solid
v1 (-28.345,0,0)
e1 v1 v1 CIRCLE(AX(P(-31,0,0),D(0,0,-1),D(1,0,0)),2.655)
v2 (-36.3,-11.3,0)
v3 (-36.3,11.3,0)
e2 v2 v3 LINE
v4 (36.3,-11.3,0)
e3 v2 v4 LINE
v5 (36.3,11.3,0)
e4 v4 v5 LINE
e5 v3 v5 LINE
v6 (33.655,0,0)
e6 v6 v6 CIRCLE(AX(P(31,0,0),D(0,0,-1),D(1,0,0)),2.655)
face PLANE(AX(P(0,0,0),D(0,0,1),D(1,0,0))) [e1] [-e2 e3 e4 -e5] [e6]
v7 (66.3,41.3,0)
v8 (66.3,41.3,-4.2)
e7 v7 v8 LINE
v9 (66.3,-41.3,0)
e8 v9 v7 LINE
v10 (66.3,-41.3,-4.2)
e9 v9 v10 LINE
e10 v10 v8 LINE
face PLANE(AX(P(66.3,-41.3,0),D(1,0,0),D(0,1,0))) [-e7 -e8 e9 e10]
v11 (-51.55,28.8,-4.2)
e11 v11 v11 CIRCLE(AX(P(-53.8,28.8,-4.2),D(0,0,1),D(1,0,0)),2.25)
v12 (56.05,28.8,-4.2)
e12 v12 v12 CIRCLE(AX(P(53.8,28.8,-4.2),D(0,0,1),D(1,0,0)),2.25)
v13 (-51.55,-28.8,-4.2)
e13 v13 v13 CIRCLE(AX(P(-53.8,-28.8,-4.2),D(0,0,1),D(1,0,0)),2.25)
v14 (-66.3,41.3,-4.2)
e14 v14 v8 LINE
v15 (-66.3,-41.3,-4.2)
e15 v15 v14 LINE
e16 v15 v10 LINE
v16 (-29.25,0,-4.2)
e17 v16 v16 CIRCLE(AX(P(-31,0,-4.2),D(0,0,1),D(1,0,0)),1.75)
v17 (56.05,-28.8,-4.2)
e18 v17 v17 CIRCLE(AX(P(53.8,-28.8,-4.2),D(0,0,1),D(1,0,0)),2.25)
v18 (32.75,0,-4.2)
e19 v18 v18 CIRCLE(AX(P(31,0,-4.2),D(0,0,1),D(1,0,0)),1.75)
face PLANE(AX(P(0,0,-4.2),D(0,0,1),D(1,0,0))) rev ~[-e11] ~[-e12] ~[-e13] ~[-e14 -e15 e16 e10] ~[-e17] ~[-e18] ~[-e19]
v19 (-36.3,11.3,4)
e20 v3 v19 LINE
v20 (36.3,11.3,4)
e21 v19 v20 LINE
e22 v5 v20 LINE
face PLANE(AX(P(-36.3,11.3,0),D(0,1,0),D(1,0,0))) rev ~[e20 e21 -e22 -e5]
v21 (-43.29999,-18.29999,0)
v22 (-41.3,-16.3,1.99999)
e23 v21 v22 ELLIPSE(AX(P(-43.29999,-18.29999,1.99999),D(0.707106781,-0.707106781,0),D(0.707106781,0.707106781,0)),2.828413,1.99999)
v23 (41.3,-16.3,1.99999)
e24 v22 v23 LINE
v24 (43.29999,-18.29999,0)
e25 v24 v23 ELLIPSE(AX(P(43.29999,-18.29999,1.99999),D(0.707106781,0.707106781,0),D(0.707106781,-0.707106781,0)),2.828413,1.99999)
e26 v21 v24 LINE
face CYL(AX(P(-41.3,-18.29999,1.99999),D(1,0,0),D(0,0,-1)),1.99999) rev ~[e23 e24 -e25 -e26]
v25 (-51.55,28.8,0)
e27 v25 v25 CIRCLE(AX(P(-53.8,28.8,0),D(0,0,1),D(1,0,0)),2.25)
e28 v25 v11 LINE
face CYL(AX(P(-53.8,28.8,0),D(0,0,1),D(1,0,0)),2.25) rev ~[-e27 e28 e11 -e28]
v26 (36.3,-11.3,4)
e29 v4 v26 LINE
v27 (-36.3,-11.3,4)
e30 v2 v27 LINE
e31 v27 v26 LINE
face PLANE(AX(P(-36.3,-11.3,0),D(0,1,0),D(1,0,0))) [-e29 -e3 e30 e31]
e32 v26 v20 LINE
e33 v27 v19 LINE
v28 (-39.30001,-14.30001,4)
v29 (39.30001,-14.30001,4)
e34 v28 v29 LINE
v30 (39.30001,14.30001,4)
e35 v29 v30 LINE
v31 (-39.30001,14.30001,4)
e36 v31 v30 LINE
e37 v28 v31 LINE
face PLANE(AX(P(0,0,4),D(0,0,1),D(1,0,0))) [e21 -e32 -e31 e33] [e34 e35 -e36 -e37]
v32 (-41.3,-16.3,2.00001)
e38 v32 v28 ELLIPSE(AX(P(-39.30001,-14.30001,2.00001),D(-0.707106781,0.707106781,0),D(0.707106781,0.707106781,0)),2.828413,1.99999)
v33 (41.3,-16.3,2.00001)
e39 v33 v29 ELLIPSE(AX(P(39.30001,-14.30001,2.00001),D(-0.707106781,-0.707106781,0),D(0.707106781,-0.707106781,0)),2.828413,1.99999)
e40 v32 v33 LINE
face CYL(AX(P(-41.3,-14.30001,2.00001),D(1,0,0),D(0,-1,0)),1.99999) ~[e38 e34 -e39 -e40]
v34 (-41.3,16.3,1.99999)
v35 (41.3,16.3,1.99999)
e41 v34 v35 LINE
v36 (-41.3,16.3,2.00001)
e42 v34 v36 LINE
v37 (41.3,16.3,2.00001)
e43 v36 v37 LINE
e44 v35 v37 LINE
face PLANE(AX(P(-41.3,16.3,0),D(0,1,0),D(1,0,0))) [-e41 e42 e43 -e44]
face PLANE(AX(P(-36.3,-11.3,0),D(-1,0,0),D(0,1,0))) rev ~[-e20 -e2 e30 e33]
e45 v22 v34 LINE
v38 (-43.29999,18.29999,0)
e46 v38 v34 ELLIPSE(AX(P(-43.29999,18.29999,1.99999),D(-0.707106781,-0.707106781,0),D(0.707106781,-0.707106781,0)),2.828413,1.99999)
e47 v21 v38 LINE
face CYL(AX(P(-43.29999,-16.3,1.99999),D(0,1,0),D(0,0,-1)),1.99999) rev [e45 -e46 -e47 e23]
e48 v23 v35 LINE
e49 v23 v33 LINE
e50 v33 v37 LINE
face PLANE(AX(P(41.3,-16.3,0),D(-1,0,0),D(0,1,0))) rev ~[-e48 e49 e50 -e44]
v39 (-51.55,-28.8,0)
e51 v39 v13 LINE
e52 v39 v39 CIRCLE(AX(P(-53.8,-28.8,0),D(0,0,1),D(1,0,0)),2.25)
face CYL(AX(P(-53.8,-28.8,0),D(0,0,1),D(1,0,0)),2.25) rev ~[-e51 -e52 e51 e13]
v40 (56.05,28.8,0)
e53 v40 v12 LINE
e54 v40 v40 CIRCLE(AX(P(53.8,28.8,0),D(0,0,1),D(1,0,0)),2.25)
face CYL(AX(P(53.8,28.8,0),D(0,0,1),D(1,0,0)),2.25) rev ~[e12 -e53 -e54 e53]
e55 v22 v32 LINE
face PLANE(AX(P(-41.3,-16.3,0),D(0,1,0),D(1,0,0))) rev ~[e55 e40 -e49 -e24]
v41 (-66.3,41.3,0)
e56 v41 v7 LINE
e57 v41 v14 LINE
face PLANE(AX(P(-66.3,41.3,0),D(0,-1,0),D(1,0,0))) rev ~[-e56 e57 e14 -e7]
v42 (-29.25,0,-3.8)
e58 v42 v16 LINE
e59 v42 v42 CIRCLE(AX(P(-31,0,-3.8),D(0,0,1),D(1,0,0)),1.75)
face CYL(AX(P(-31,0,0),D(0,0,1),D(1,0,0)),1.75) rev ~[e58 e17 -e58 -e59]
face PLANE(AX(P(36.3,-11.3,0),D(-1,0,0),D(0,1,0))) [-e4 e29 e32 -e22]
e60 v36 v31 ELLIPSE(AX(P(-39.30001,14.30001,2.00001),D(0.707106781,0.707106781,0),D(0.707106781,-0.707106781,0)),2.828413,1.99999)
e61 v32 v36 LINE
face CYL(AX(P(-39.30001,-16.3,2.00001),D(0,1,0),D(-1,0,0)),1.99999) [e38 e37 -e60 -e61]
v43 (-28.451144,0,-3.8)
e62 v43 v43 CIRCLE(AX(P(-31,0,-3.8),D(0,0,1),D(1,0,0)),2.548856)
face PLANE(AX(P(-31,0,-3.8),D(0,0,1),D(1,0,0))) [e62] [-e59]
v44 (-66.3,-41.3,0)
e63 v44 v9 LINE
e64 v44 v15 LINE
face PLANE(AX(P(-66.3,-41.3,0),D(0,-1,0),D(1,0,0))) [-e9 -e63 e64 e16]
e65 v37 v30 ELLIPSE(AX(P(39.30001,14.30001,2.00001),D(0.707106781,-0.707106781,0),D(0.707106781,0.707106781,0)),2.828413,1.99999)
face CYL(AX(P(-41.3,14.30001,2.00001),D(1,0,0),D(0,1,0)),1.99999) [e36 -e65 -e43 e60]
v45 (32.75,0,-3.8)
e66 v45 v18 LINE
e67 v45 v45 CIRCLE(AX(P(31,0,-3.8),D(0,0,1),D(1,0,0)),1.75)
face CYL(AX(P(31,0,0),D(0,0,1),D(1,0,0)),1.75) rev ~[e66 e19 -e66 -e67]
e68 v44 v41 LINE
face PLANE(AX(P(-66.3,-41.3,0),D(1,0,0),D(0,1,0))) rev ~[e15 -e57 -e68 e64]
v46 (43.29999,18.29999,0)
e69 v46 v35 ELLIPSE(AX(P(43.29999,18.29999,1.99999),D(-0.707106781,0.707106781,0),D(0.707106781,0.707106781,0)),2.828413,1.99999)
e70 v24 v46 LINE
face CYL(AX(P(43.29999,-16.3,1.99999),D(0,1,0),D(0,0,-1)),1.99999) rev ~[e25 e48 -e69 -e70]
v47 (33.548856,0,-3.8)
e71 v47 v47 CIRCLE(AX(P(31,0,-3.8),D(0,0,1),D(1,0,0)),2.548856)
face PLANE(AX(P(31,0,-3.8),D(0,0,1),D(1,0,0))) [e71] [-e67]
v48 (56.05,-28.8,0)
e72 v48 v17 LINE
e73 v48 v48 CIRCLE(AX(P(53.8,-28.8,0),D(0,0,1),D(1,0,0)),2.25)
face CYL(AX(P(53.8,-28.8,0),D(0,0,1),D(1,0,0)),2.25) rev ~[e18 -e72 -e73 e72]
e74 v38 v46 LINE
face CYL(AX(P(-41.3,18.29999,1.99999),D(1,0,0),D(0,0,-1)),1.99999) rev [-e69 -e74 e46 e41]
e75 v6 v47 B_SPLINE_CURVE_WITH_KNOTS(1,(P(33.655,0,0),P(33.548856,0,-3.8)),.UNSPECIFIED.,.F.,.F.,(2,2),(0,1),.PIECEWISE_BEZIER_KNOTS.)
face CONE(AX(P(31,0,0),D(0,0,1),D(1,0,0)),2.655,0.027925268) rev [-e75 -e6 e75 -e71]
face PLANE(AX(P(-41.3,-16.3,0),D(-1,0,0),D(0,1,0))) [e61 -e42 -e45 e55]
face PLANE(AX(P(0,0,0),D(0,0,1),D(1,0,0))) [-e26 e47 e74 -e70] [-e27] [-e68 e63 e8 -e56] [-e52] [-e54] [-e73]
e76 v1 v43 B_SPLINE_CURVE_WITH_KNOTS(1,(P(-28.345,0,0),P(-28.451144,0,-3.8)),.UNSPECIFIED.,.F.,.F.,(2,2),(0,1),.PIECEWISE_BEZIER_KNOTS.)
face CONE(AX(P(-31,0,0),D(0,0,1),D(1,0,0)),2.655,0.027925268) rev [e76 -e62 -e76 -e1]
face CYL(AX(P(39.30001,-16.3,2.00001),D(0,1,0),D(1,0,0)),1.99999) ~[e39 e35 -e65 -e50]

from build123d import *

# Parameters (mm, degrees)
F1_W     = 132.6
F1_H     = 82.6
F1_R     = 2.25
F2_DEPTH = 4.2
F0_W     = 82.6
F0_H     = 32.6
F0_W_2   = 72.6
F0_H_2   = 22.6
F3_DEPTH = 4
F4_R     = 2.655
F5_DEPTH = 3.8
F5_TAPER = 1.6
F6_R     = 1.75
F7_DEPTH = 4.201
F8_R     = 1.99999


# Not quite as in the source:
# - a fillet or chamfer is up to 0.001 mm smaller than in the source, because OpenCascade refuses the exact size


with BuildPart() as f2:
    # F1 (on Top) → F2 (new body)
    with BuildSketch(Plane.XY):
        Rectangle(F1_W, F1_H)
        with Locations((-53.8, -28.8)):
            Circle(F1_R, mode=Mode.SUBTRACT)
        with Locations((53.8, -28.8)):
            Circle(F1_R, mode=Mode.SUBTRACT)
        with Locations((-53.8, 28.8)):
            Circle(F1_R, mode=Mode.SUBTRACT)
        with Locations((53.8, 28.8)):
            Circle(F1_R, mode=Mode.SUBTRACT)
    extrude(amount=-F2_DEPTH)

    # F0 (on Top) → F3 (join)
    with BuildSketch(Plane.XY):
        Rectangle(F0_W, F0_H)
        Rectangle(F0_W_2, F0_H_2, mode=Mode.SUBTRACT)
    extrude(amount=F3_DEPTH)

    # F4 (on face) → F5 (cut)
    with BuildSketch(Plane.XY):
        with Locations((-31, 0)):
            Circle(F4_R)
        with Locations((31, 0)):
            Circle(F4_R)
    extrude(amount=-F5_DEPTH, taper=F5_TAPER, mode=Mode.SUBTRACT)

    # F6 (on face) → F7 (cut, through all)
    with BuildSketch(Plane.XY):
        with Locations((31, 0)):
            Circle(F6_R)
        with Locations((-31, 0)):
            Circle(F6_R)
    extrude(amount=-F7_DEPTH, mode=Mode.SUBTRACT)

    # F8 (radius 2 in the source; OpenCascade refuses exactly that, so slightly less here)
    f8_edges = [f2.edges().sort_by_distance(p)[0] for p in [
        (0, 16.3, 0),
        (-41.3, 0, 0),
        (0, -16.3, 0),
        (41.3, 0, 0),
        (0, -16.3, 4),
        (41.3, 0, 4),
        (0, 16.3, 4),
        (-41.3, 0, 4),
    ]]
    fillet(f8_edges, radius=F8_R)


solid = f2.part
